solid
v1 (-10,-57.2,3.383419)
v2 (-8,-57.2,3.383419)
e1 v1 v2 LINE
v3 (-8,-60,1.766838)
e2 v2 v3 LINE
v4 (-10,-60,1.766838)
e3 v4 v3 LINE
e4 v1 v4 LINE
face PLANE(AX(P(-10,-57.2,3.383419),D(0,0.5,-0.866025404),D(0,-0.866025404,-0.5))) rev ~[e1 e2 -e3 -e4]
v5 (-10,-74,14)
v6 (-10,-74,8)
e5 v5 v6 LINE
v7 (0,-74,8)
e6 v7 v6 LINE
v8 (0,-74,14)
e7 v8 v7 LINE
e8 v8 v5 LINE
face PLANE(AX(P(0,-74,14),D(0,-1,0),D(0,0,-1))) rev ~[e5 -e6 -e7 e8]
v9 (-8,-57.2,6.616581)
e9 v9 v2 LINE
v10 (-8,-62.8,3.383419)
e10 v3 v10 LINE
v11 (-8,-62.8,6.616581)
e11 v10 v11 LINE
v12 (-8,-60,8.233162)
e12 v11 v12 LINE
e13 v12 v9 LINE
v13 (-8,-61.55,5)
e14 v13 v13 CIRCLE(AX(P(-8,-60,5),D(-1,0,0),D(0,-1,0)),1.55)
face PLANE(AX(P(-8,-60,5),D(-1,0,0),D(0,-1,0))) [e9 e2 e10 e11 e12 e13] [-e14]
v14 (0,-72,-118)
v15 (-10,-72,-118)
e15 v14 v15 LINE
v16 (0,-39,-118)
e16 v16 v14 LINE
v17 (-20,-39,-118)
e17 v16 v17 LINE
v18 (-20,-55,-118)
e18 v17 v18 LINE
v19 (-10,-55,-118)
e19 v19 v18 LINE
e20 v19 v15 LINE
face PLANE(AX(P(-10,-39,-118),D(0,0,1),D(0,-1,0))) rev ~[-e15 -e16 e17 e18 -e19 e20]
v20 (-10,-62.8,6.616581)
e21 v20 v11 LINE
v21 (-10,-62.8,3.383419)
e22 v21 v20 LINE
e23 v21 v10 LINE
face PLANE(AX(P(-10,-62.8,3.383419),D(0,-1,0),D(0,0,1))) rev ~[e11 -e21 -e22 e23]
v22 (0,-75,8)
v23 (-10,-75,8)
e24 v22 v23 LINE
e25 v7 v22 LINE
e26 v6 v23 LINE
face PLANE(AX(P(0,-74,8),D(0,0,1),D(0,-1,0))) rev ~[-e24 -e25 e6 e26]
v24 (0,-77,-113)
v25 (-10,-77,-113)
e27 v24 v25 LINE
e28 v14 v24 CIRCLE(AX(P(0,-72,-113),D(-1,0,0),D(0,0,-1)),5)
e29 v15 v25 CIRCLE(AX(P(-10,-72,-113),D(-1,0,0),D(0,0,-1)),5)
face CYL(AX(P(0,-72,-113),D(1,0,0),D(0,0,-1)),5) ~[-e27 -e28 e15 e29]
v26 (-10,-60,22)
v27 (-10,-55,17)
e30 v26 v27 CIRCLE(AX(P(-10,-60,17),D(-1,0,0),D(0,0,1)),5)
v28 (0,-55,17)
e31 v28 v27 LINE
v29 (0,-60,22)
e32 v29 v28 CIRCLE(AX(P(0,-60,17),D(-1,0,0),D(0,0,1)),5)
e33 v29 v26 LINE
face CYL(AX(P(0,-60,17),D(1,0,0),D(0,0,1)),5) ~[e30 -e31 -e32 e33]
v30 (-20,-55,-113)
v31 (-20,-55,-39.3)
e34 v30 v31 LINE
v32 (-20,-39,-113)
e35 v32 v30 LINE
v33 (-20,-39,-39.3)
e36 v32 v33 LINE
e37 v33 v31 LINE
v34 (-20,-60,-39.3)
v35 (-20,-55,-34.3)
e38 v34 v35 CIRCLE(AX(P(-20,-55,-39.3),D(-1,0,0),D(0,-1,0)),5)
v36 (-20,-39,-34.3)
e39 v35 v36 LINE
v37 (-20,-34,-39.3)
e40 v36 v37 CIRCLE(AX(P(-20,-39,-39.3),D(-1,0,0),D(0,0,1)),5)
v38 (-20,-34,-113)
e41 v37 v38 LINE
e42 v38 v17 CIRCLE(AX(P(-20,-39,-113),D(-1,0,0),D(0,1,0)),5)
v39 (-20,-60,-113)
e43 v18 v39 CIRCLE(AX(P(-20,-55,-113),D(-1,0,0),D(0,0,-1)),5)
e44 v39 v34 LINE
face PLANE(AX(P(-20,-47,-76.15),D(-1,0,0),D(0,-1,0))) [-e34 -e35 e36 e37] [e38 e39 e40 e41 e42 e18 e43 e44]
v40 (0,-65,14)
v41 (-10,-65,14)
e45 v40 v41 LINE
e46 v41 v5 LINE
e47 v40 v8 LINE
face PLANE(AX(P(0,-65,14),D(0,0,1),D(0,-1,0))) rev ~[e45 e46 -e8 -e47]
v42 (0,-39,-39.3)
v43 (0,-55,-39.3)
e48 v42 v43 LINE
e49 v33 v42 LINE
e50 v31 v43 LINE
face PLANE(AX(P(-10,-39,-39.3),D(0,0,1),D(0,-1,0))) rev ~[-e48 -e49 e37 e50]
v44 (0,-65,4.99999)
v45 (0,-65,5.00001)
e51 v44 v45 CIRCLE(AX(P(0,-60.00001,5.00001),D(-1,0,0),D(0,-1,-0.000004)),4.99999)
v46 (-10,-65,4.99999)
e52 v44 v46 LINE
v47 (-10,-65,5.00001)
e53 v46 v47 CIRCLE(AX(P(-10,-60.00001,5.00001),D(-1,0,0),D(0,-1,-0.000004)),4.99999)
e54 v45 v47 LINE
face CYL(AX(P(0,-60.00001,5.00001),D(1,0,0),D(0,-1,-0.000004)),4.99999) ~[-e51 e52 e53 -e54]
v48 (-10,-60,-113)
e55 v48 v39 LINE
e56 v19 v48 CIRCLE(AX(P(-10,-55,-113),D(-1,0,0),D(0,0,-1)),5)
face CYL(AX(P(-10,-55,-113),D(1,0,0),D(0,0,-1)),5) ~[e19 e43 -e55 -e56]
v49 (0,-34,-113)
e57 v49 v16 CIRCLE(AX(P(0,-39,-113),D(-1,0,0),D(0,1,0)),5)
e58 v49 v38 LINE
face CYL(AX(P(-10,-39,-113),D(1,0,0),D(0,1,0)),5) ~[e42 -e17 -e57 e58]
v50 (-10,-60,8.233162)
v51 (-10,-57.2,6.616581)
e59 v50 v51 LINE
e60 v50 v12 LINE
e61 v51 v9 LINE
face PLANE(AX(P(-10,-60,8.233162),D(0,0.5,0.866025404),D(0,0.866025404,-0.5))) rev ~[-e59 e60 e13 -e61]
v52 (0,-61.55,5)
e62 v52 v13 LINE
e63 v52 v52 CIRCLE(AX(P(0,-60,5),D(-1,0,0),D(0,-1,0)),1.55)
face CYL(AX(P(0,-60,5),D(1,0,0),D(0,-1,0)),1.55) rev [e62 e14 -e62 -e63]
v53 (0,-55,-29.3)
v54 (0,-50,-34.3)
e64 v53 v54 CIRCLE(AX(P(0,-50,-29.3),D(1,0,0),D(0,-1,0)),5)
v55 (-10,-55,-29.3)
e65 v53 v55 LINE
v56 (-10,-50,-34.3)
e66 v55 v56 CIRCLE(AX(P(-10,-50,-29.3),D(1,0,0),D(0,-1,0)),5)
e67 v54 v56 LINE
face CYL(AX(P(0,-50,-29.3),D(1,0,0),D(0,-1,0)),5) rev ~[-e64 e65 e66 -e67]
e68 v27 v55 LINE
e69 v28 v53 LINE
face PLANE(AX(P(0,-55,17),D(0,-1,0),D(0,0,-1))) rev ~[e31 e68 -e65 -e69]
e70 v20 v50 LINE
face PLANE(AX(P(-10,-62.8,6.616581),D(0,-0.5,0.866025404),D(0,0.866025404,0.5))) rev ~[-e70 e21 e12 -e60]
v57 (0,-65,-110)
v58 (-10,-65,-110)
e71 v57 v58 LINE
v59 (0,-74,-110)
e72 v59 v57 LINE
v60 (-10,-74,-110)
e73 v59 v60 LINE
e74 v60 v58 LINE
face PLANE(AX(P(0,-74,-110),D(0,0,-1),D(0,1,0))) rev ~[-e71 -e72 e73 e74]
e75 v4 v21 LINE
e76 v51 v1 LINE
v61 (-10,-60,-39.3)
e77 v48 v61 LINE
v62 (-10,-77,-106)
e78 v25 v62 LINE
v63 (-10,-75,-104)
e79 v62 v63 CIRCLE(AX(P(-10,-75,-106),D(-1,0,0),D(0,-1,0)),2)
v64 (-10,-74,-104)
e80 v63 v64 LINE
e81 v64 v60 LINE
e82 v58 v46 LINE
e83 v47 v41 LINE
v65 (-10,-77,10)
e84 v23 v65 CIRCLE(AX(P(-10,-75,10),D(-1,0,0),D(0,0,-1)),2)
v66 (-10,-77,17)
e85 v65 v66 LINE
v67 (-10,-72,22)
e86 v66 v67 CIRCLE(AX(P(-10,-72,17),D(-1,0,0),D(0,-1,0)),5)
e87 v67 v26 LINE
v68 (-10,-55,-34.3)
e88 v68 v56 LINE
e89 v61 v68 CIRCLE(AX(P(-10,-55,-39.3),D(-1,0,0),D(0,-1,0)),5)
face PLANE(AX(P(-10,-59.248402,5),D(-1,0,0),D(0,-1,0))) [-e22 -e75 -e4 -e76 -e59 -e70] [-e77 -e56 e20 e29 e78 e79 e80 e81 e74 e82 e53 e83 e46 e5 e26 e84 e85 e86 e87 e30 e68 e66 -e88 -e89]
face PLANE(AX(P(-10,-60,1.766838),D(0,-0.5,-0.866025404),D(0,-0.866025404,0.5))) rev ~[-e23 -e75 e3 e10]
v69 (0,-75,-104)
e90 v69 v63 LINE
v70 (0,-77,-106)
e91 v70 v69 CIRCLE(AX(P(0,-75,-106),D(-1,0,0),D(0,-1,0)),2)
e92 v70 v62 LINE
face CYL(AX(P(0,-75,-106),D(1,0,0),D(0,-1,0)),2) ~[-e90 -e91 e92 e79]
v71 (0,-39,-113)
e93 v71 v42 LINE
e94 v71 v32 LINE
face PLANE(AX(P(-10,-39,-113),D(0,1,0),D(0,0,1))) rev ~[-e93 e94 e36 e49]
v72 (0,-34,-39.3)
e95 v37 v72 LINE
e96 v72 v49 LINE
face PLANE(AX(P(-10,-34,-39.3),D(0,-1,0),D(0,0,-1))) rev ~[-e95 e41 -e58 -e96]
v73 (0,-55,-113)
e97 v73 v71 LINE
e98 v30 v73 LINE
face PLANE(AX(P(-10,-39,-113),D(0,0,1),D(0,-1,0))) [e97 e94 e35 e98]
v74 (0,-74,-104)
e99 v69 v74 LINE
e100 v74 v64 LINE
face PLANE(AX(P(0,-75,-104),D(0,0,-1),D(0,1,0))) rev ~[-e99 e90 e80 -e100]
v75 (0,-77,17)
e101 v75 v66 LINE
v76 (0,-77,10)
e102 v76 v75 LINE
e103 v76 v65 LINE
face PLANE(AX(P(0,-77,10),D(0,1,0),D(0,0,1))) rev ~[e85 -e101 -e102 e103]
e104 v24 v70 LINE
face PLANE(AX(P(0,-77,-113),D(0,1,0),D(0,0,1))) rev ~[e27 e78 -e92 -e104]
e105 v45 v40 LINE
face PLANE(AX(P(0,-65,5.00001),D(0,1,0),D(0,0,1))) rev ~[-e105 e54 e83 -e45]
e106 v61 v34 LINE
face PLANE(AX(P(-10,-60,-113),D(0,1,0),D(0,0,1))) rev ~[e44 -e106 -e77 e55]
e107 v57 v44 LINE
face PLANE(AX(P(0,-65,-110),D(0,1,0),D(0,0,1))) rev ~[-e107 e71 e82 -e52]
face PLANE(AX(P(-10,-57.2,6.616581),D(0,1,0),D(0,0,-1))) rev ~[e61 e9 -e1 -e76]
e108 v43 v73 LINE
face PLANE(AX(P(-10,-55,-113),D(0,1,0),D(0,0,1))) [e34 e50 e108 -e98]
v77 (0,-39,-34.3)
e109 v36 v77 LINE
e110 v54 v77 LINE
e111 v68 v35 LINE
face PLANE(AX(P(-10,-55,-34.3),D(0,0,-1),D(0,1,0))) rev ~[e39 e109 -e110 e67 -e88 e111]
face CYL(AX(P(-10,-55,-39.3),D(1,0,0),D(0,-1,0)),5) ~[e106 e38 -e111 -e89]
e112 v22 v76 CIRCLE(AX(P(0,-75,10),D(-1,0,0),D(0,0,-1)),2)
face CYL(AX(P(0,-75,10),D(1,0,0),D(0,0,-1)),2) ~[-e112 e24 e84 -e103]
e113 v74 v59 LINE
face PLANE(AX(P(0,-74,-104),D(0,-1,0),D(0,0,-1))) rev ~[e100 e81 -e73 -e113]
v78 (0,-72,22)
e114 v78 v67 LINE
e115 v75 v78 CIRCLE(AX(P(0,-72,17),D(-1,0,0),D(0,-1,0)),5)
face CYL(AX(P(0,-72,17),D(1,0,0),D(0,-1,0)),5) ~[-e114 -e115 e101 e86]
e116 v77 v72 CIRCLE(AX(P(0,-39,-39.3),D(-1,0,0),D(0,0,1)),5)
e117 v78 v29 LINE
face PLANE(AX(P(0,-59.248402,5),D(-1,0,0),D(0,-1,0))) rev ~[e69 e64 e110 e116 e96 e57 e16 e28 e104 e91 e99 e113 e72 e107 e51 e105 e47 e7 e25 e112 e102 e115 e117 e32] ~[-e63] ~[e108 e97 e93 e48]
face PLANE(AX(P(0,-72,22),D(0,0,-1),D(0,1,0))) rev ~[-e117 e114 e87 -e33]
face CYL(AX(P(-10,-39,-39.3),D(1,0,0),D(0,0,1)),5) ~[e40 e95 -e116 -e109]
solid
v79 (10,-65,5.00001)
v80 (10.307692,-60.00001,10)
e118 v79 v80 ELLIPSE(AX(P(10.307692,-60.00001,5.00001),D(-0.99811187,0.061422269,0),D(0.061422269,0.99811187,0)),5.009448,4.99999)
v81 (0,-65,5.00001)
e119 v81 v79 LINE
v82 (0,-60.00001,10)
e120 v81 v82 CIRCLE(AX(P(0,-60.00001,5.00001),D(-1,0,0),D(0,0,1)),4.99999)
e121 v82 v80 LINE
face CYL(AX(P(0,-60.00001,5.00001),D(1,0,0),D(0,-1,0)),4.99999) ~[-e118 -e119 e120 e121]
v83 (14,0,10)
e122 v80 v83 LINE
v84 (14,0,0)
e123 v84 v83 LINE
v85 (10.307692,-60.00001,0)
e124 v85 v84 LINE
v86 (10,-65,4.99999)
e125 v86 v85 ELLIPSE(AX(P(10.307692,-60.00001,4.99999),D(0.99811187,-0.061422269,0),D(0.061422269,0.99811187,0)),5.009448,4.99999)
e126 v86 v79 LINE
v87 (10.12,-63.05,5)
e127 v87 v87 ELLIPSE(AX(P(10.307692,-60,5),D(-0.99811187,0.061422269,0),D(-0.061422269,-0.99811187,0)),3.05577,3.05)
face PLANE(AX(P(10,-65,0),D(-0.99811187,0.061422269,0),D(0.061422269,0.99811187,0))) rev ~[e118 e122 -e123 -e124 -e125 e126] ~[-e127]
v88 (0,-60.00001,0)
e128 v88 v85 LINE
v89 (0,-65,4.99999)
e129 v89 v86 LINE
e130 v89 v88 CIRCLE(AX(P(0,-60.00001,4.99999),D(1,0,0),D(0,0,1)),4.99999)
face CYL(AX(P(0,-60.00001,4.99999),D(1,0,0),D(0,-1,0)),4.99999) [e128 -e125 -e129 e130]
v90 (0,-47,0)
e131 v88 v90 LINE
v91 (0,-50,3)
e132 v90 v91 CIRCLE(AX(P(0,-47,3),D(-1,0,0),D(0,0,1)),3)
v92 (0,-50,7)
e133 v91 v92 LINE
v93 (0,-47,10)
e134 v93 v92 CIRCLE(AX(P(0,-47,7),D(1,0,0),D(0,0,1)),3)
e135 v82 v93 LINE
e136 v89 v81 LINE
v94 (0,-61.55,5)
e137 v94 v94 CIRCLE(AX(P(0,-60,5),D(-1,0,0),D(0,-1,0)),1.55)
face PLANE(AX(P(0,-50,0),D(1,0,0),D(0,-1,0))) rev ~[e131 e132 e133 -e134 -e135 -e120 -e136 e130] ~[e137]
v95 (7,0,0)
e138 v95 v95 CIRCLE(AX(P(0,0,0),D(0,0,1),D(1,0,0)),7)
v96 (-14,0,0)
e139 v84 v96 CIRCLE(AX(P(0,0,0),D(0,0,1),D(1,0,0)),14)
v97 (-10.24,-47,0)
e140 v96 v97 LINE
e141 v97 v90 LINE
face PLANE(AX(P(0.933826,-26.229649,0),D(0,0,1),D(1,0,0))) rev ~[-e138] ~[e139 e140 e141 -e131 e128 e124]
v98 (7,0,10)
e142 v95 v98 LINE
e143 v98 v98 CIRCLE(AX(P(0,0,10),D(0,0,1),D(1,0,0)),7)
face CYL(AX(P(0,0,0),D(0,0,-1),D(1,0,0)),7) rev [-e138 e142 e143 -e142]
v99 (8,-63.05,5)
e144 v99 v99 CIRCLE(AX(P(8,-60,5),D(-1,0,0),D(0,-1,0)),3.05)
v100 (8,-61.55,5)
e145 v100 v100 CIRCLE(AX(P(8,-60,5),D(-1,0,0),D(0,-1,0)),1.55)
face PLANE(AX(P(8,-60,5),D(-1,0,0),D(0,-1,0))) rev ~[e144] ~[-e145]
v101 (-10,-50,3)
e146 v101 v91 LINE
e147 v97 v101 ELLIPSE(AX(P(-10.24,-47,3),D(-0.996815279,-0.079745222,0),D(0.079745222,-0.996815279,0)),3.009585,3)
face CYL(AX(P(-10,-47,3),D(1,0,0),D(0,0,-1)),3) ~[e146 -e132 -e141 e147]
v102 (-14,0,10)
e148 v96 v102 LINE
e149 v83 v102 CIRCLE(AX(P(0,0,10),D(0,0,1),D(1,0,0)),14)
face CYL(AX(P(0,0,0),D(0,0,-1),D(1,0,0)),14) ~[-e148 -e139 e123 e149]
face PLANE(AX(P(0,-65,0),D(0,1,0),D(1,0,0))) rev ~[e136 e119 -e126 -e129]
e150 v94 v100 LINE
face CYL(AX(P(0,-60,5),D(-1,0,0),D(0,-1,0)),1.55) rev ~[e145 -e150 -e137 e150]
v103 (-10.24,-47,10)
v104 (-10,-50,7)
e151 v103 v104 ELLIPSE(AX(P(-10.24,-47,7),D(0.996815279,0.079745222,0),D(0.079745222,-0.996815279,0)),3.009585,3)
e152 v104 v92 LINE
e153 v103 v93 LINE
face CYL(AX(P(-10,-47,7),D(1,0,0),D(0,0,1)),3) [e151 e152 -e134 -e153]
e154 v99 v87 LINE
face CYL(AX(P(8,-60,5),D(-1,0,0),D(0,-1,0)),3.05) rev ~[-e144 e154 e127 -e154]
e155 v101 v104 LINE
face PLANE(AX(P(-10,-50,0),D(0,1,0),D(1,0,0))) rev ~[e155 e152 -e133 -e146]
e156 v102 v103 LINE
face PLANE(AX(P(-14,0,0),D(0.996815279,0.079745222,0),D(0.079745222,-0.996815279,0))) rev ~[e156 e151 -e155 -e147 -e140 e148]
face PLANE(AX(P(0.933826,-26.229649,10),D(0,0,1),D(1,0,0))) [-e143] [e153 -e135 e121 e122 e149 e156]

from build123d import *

# Parameters (mm, degrees)
F0_R      = 7
F1_DEPTH  = 10
F2_R      = 4.99999
F3_R      = 1.55
F4_DEPTH  = 11.4030769231
F5_START  = -8
F3_R_2    = 3.05
F5_DEPTH  = 4
F6_R      = 1.55
F7_DEPTH  = 10
F8_R      = 1.55
F9_DEPTH  = 2
F10_R     = 3
F11_W     = 16
F11_H     = 73.7
F12_DEPTH = 10


# Not quite as in the source:
# - a fillet or chamfer is up to 0.001 mm smaller than in the source, because OpenCascade refuses the exact size
# - ends of sketch curves that miss each other by under 0.0002 mm in the source are joined
# - a feature names something its author has since deleted; it is built from what else it names


with BuildPart() as f1:
    # F0 (on Top) → F1 (new body)
    with BuildSketch(Plane.XY):
        with BuildLine():
            Line((10, -65), (14, 0))
            ThreePointArc((14, 0), (0, 14), (-14, 0))
            Line((-14, 0), (-10, -50))
            Line((-10, -50), (0, -50))
            Line((0, -50), (0, -65))
            Line((0, -65), (10, -65))
        make_face()
        Circle(F0_R, mode=Mode.SUBTRACT)
    extrude(amount=F1_DEPTH)

    # F2 (radius 5 in the source; OpenCascade refuses exactly that, so slightly less here)
    f2_edges = [f1.edges().sort_by_distance(p)[0] for p in [
        (5, -65, 10),
        (5, -65, 0),
    ]]
    fillet(f2_edges, radius=F2_R)

    # F3 (on face) → F4 (cut, up to face)
    with BuildSketch(Plane(origin=(0, 0, 0), x_dir=(0, -1, 0), z_dir=(-1, 0, 0))):
        with Locations((60, 5)):
            Circle(F3_R)
    extrude(amount=-F4_DEPTH, mode=Mode.SUBTRACT)

    # F3 (on face) → F5 (cut)
    with BuildSketch(Plane(origin=(0, 0, 0), x_dir=(0, -1, 0), z_dir=(-1, 0, 0)).offset(F5_START)):
        with Locations((60, 5)):
            Circle(F3_R_2)
        with Locations((60, 5)):
            Circle(F3_R, mode=Mode.SUBTRACT)
    extrude(amount=-F5_DEPTH, mode=Mode.SUBTRACT)

    # F10
    f10_edges = [f1.edges().sort_by_distance(p)[0] for p in [
        (-5, -50, 10),
        (-5, -50, 0),
    ]]
    fillet(f10_edges, radius=F10_R)


with BuildPart() as f7:
    # F6 (on face) → F7 (new body)
    with BuildSketch(Plane(origin=(0, 0, 0), x_dir=(0, -1, 0), z_dir=(-1, 0, 0))):
        with BuildLine():
            ThreePointArc((60.00001, 0), (63.5355368349, 1.4644631651), (65, 4.99999))
            ThreePointArc((65, 4.99999), (63.5355368349, 8.5355368349), (60.00001, 10))
            Line((60.00001, 10), (55, 10))
            Line((55, 10), (55, 0))
            Line((55, 0), (60.00001, 0))
        make_face()
        with Locations((60, 5)):
            Circle(F6_R, mode=Mode.SUBTRACT)
        with BuildLine():
            Line((74, -110), (65, -110))
            Line((65, -110), (65, 5))
            ThreePointArc((65, 5), (63.5355368349, 1.4644631651), (60.00001, 0))
            Line((60.00001, 0), (55, 0))
            Line((55, 0), (55, -29.3))
            ThreePointArc((55, -29.3), (53.5355339059, -32.8355339059), (50, -34.3))
            Line((50, -34.3), (39, -34.3))
            ThreePointArc((39, -34.3), (35.4644660941, -35.7644660941), (34, -39.3))
            Line((34, -39.3), (34, -113))
            ThreePointArc((34, -113), (35.4644660941, -116.5355339059), (39, -118))
            Line((39, -118), (72, -118))
            ThreePointArc((72, -118), (75.5355339059, -116.5355339059), (77, -113))
            Line((77, -113), (77, -106))
            ThreePointArc((77, -106), (76.4142135624, -104.5857864376), (75, -104))
            Line((75, -104), (74, -104))
            Line((74, -104), (74, -110))
        make_face()
        Polygon((55, -39.3), (55, -110), (55, -113), (39, -113), (39, -39.3), align=None, mode=Mode.SUBTRACT)
        with BuildLine():
            ThreePointArc((60.00001, 10), (63.5355368349, 8.5355368349), (65, 5.00001))
            Line((65, 5.00001), (65, 14))
            Line((65, 14), (74, 14))
            Line((74, 14), (74, 8))
            Line((74, 8), (75, 8))
            ThreePointArc((75, 8), (76.4142135624, 8.5857864376), (77, 10))
            Line((77, 10), (77, 17))
            ThreePointArc((77, 17), (75.5355339059, 20.5355339059), (72, 22))
            Line((72, 22), (60, 22))
            ThreePointArc((60, 22), (56.4644660941, 20.5355339059), (55, 17))
            Line((55, 17), (55, 14))
            Line((55, 14), (55, 10))
            Line((55, 10), (60.00001, 10))
        make_face()
    extrude(amount=F7_DEPTH)

    # F8 (on face) → F9 (cut)
    with BuildSketch(Plane(origin=(-10, 0, 0), x_dir=(0, -1, 0), z_dir=(-1, 0, 0))):
        Polygon((62.8, 3.3834192463), (62.8, 6.6165807537), (60, 8.2331615075), (57.2, 6.6165807537), (57.2, 3.3834192463), (60, 1.7668384925), align=None)
        with Locations((60, 5)):
            Circle(F8_R, mode=Mode.SUBTRACT)
    extrude(amount=-F9_DEPTH, mode=Mode.SUBTRACT)

    # F11 (on face) → F12 (join)
    with BuildSketch(Plane(origin=(-10, 0, 0), x_dir=(0, -1, 0), z_dir=(-1, 0, 0))):
        with BuildLine():
            Line((34, -39.3), (34, -113))
            ThreePointArc((34, -113), (35.4644660941, -116.5355339059), (39, -118))
            Line((39, -118), (55, -118))
            ThreePointArc((55, -118), (58.5355339059, -116.5355339059), (60, -113))
            Line((60, -113), (60, -39.3))
            ThreePointArc((60, -39.3), (58.5355339059, -35.7644660941), (55, -34.3))
            Line((55, -34.3), (50, -34.3))
            Line((50, -34.3), (39, -34.3))
            ThreePointArc((39, -34.3), (35.4644660941, -35.7644660941), (34, -39.3))
        make_face()
        with Locations((47, -76.15)):
            Rectangle(F11_W, F11_H, mode=Mode.SUBTRACT)
    extrude(amount=F12_DEPTH)


solid = Compound([f1.part, f7.part])
